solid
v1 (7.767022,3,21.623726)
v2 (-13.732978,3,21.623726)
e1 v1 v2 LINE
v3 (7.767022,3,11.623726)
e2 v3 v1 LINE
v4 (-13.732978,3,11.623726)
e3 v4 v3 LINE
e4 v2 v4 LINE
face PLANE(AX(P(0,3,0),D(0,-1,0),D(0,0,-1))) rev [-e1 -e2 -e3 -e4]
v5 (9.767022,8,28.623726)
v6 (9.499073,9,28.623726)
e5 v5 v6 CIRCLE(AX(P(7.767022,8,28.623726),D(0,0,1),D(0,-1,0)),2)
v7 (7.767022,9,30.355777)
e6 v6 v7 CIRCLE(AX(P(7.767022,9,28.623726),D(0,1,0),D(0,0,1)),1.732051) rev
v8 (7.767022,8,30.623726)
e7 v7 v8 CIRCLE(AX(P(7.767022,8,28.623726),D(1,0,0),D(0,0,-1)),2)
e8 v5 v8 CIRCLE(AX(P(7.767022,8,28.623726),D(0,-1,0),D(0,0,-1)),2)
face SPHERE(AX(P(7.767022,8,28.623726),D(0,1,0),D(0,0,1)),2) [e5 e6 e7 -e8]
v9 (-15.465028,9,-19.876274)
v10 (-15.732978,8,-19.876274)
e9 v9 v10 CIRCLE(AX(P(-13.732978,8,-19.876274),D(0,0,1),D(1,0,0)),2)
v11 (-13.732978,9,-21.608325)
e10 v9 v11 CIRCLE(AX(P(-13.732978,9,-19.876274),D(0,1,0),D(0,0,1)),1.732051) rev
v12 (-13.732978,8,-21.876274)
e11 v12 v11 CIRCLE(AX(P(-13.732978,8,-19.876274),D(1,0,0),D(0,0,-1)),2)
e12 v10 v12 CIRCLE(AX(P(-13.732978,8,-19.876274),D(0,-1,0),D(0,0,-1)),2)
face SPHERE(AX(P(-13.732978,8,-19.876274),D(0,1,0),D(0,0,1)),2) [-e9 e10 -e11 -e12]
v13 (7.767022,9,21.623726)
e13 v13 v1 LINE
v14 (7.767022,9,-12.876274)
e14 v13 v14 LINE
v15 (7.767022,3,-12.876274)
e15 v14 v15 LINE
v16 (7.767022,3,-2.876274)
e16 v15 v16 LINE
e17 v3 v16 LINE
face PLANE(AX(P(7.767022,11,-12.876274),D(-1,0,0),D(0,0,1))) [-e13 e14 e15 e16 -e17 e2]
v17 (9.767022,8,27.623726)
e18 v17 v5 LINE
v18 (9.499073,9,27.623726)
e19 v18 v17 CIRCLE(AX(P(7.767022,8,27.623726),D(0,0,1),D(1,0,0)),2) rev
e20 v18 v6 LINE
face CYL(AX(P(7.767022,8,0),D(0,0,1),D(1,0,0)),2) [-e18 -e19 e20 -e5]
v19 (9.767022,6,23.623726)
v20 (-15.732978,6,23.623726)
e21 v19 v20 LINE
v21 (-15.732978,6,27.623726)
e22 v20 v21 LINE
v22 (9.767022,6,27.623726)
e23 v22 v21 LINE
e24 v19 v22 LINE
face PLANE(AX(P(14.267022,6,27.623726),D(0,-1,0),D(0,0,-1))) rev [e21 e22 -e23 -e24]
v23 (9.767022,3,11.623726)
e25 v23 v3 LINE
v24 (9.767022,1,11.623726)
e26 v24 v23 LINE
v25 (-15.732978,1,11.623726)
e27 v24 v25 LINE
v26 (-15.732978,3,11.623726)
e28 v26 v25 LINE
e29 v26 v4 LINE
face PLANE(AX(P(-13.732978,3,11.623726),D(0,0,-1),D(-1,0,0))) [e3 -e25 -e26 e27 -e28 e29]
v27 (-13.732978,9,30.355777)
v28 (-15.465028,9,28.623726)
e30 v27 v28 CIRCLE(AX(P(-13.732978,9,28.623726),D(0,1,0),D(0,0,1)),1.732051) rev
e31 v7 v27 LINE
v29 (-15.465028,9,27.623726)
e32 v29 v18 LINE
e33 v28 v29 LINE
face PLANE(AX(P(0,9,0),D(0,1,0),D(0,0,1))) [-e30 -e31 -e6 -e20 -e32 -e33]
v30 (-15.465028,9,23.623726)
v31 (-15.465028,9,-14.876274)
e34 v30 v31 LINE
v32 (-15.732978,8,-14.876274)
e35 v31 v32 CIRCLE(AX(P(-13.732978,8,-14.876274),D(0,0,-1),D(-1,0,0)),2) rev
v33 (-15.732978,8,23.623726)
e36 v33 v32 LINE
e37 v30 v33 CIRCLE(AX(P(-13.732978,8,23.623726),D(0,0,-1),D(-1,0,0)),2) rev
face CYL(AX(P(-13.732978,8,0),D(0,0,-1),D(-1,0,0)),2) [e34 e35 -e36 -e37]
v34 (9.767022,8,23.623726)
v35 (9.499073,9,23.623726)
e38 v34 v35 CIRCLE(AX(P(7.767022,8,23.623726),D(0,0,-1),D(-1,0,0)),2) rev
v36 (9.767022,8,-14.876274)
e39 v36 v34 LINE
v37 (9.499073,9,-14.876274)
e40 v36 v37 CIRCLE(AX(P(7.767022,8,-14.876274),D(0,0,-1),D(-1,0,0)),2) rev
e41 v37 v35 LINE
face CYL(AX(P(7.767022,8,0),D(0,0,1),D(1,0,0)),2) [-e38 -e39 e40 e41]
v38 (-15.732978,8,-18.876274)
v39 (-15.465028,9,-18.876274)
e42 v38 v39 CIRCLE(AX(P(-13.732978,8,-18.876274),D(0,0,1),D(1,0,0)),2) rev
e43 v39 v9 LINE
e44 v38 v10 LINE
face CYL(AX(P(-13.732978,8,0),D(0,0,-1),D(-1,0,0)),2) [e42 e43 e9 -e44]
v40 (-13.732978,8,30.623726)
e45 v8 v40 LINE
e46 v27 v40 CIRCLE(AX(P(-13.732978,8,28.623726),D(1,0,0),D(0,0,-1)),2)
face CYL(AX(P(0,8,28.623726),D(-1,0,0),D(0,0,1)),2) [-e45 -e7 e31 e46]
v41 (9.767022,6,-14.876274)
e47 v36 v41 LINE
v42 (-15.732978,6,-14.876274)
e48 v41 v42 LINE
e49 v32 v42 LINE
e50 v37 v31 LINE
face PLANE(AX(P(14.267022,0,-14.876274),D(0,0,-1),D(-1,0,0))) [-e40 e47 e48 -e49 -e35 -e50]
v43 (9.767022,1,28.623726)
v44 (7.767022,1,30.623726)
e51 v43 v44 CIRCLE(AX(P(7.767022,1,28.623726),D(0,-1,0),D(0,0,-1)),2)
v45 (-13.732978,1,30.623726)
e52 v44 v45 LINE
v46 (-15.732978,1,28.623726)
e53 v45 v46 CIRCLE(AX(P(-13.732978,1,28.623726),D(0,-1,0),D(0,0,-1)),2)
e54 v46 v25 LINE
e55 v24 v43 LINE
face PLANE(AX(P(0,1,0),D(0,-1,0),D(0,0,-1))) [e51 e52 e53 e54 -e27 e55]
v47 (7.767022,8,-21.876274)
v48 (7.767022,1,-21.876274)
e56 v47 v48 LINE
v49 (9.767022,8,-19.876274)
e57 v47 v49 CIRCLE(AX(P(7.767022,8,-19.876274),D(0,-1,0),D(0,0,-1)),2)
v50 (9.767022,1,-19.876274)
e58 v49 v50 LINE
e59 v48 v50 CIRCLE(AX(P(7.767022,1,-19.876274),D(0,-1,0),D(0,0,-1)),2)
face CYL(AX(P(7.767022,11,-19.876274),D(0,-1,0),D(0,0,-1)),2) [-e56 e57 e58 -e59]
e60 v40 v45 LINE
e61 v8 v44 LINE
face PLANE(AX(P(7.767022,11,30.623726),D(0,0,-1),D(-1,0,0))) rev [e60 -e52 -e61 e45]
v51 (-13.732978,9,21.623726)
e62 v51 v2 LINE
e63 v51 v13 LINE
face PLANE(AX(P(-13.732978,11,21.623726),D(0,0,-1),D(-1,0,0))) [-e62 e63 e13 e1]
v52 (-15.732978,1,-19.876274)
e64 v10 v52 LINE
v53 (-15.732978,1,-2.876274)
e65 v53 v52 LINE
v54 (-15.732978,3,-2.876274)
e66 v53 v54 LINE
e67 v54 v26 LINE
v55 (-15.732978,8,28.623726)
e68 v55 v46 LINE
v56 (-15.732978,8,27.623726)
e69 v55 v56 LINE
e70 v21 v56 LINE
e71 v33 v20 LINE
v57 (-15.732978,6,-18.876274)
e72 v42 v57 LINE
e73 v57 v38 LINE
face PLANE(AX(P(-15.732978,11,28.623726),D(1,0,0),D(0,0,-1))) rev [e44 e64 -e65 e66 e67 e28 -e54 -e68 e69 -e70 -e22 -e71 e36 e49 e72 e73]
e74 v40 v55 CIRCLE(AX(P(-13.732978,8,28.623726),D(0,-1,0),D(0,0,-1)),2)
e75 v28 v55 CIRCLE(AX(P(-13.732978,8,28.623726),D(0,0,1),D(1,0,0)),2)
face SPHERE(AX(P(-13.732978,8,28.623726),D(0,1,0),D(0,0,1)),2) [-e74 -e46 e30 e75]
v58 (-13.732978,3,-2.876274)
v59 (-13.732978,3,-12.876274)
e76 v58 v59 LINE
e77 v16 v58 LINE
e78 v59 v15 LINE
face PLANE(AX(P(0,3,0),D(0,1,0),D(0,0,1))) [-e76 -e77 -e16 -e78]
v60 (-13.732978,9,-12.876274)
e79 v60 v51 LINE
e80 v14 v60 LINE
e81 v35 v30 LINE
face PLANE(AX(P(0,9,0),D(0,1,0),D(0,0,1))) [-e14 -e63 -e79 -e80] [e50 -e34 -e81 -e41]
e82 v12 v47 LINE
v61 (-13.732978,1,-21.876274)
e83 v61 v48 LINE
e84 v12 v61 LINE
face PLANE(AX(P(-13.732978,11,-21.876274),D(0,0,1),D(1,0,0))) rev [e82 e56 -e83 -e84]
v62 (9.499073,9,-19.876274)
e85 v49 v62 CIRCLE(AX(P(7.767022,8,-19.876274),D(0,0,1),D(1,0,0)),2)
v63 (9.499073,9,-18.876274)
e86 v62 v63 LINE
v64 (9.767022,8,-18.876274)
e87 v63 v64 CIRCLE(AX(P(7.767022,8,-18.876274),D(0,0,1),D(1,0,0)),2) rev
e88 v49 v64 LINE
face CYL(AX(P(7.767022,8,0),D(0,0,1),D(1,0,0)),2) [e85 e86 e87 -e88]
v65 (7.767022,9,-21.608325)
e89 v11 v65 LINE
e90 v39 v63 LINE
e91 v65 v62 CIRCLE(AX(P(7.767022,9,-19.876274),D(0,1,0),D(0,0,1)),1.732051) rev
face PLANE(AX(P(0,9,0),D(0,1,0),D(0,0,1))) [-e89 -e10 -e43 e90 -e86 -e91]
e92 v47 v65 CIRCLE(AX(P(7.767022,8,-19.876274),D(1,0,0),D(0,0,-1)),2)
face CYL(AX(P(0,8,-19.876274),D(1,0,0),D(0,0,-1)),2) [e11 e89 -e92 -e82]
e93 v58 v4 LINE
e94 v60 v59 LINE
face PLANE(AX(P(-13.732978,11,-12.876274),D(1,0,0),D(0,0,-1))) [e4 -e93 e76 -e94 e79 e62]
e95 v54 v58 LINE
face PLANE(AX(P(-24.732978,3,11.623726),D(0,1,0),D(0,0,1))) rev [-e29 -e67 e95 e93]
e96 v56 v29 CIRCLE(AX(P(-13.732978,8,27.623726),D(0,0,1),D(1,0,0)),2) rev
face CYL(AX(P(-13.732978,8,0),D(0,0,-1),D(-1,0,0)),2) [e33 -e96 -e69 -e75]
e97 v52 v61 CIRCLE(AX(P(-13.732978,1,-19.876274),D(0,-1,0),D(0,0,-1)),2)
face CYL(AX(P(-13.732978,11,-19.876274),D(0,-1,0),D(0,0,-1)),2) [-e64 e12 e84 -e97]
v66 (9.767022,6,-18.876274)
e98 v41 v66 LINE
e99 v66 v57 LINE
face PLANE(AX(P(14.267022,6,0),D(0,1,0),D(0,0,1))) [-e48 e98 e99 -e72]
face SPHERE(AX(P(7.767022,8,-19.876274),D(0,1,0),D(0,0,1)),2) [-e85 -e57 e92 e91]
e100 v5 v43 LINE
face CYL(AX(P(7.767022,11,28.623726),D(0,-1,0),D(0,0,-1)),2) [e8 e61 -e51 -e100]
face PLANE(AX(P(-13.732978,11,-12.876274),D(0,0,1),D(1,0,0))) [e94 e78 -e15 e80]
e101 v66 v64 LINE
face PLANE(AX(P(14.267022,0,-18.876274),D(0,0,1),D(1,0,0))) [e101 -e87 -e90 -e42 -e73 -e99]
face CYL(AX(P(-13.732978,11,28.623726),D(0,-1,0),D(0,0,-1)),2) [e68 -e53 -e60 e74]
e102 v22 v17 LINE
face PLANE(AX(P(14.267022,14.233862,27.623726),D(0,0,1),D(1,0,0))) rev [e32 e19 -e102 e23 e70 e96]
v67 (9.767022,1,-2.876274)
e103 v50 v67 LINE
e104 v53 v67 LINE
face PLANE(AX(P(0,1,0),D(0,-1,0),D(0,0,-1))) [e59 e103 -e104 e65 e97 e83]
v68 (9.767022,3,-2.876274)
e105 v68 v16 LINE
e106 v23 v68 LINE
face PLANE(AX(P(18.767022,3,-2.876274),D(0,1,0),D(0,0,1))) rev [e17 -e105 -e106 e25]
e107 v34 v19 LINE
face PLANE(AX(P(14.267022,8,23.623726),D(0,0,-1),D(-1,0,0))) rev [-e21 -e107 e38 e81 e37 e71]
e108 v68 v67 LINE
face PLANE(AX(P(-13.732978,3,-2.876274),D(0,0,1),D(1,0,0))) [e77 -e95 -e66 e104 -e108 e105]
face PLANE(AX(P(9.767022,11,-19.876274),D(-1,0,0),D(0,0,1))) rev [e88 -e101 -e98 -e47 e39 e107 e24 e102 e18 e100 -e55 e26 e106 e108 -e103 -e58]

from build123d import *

# Parameters (mm, degrees)
SKETCH_1_W          = 21.5
SKETCH_1_H          = 34.5
EXTRUDE_2_DEPTH     = 11
FILLET_1_R          = 2
SKETCH_2_W          = 39.173485157
SKETCH_2_H          = 57.857292793
CUT_EXTRUDE_1_DEPTH = 1
SKETCH_3_W          = 21.5
SKETCH_3_H          = 10
EXTRUDE_3_DEPTH     = 3
SKETCH_4_W          = 36.577122412
SKETCH_4_H          = 60.487116615
CUT_EXTRUDE_2_DEPTH = 1
SKETCH_5_W          = 14.5
SKETCH_5_H          = 3
CUT_EXTRUDE_3_DEPTH = 11
SKETCH_6_W          = 14.5
SKETCH_6_H          = 3
CUT_EXTRUDE_4_DEPTH = 11
SKETCH_7_W          = 57.52189795
SKETCH_7_H          = 59.987072635
CUT_EXTRUDE_5_DEPTH = 1
SKETCH_8_W          = 21.5
SKETCH_8_H          = 34.5
EXTRUDE_4_DEPTH     = 1
FILLET_2_R          = 2
SKETCH_9_W          = 42.225742073
SKETCH_9_H          = 59.055369136
CUT_EXTRUDE_6_DEPTH = 1
SKETCH_10_W         = 4
SKETCH_10_H         = 2
SKETCH_10_H_2       = 3.79495429
CUT_EXTRUDE_8_DEPTH = 30
CUT_EXTRUDE_9_DEPTH = 30


with BuildPart() as part:
    # 草图1 → 凸台-拉伸2 (new body)
    with BuildSketch(Plane(origin=(0, 0, 0), x_dir=(1, 0, 0), z_dir=(0, 1, 0))):
        with BuildLine():
            Line((-13.732977682, 21.876274057), (7.767022318, 21.876274057))
            ThreePointArc((7.767022318, 21.876274057), (9.18123588, 21.290487619), (9.767022318, 19.876274057))
            Line((9.767022318, 19.876274057), (9.767022318, -28.623725943))
            ThreePointArc((9.767022318, -28.623725943), (9.18123588, -30.037939506), (7.767022318, -30.623725943))
            Line((7.767022318, -30.623725943), (-13.732977682, -30.623725943))
            ThreePointArc((-13.732977682, -30.623725943), (-15.147191244, -30.037939506), (-15.732977682, -28.623725943))
            Line((-15.732977682, -28.623725943), (-15.732977682, 19.876274057))
            ThreePointArc((-15.732977682, 19.876274057), (-15.147191244, 21.290487619), (-13.732977682, 21.876274057))
        make_face()
        with Locations((-2.982977682, -4.373725943)):
            Rectangle(SKETCH_1_W, SKETCH_1_H, mode=Mode.SUBTRACT)
    extrude(amount=EXTRUDE_2_DEPTH)

    # 圆角1
    fillet_1_edges = [part.edges().sort_by_distance(p)[0] for p in [
        (-15.147191244, 11, -21.290487619),
        (-15.732977682, 11, 4.373725943),
        (-15.147191244, 11, 30.037939506),
        (-2.982977682, 11, 30.623725943),
        (9.18123588, 11, 30.037939506),
        (9.767022318, 11, 4.373725943),
        (9.18123588, 11, -21.290487619),
        (-2.982977682, 11, -21.876274057),
    ]]
    fillet(fillet_1_edges, radius=FILLET_1_R - 0.0001)  # a hair under: the kernel refuses the full size

    # 草图2 → 切除-拉伸1 (cut)
    with BuildSketch(Plane(origin=(0, 11, 0), x_dir=(1, 0, 0), z_dir=(0, 1, 0))):
        with Locations((-2.456788303, -4.185742432)):
            Rectangle(SKETCH_2_W, SKETCH_2_H)
    extrude(amount=-CUT_EXTRUDE_1_DEPTH, mode=Mode.SUBTRACT)

    # 草图3 → 凸台-拉伸3 (add)
    with BuildSketch(Plane(origin=(0, 0, 0), x_dir=(-1, 0, 0), z_dir=(0, -1, 0))):
        with Locations((2.982977682, -16.623725943)):
            Rectangle(SKETCH_3_W, SKETCH_3_H)
        with Locations((2.982977682, 7.876274057)):
            Rectangle(SKETCH_3_W, SKETCH_3_H)
    extrude(amount=-EXTRUDE_3_DEPTH)

    # 草图4 → 切除-拉伸2 (cut)
    with BuildSketch(Plane(origin=(0, 10, 0), x_dir=(1, 0, 0), z_dir=(0, 1, 0))):
        with Locations((-2.114714468, -5.96144712)):
            Rectangle(SKETCH_4_W, SKETCH_4_H)
    extrude(amount=-CUT_EXTRUDE_2_DEPTH, mode=Mode.SUBTRACT)

    # 草图5 → 切除-拉伸3 (cut)
    with BuildSketch(Plane(origin=(-13.732977682, 0, 0), x_dir=(0, 0, -1), z_dir=(1, 0, 0))):
        with Locations((-4.373725943, 1.5)):
            Rectangle(SKETCH_5_W, SKETCH_5_H)
    extrude(amount=-CUT_EXTRUDE_3_DEPTH, mode=Mode.SUBTRACT)

    # 草图6 → 切除-拉伸4 (cut)
    with BuildSketch(Plane.ZY.offset(-7.767022318)):
        with Locations((4.373725943, 1.5)):
            Rectangle(SKETCH_6_W, SKETCH_6_H)
    extrude(amount=-CUT_EXTRUDE_4_DEPTH, mode=Mode.SUBTRACT)

    # 草图7 → 切除-拉伸5 (cut)
    with BuildSketch(Plane(origin=(0, 0, 0), x_dir=(-1, 0, 0), z_dir=(0, -1, 0))):
        with Locations((4.496549364, -6.319684839)):
            Rectangle(SKETCH_7_W, SKETCH_7_H)
    extrude(amount=-CUT_EXTRUDE_5_DEPTH, mode=Mode.SUBTRACT)

    # 草图8 → 凸台-拉伸4 (add)
    with BuildSketch(Plane(origin=(0, 9, 0), x_dir=(1, 0, 0), z_dir=(0, 1, 0))):
        with BuildLine():
            Line((9.767022318, -28.623725943), (9.767022318, 19.876274057))
            ThreePointArc((9.767022318, 19.876274057), (9.18123588, 21.290487619), (7.767022318, 21.876274057))
            Line((7.767022318, 21.876274057), (-13.732977682, 21.876274057))
            ThreePointArc((-13.732977682, 21.876274057), (-15.147191244, 21.290487619), (-15.732977682, 19.876274057))
            Line((-15.732977682, 19.876274057), (-15.732977682, -28.623725943))
            ThreePointArc((-15.732977682, -28.623725943), (-15.147191244, -30.037939506), (-13.732977682, -30.623725943))
            Line((-13.732977682, -30.623725943), (7.767022318, -30.623725943))
            ThreePointArc((7.767022318, -30.623725943), (9.18123588, -30.037939506), (9.767022318, -28.623725943))
        make_face()
        with Locations((-2.982977682, -4.373725943)):
            Rectangle(SKETCH_8_W, SKETCH_8_H, mode=Mode.SUBTRACT)
    extrude(amount=EXTRUDE_4_DEPTH)

    # 圆角2
    fillet_2_edges = [part.edges().sort_by_distance(p)[0] for p in [
        (9.767022318, 10, 4.373725943),
        (9.18123588, 10, -21.290487619),
        (-2.982977682, 10, -21.876274057),
        (-15.147191244, 10, -21.290487619),
        (-15.732977682, 10, 4.373725943),
        (-15.147191244, 10, 30.037939506),
        (-2.982977682, 10, 30.623725943),
        (9.18123588, 10, 30.037939506),
    ]]
    fillet(fillet_2_edges, radius=FILLET_2_R - 0.0001)  # a hair under: the kernel refuses the full size

    # 草图9 → 切除-拉伸6 (cut)
    with BuildSketch(Plane(origin=(0, 10, 0), x_dir=(1, 0, 0), z_dir=(0, 1, 0))):
        with Locations((1.20063142, -3.725323224)):
            Rectangle(SKETCH_9_W, SKETCH_9_H)
    extrude(amount=-CUT_EXTRUDE_6_DEPTH, mode=Mode.SUBTRACT)

    # 草图10 → 切除-拉伸8 (cut)
    with BuildSketch(Plane.ZY.offset(15.732977682)):
        with Locations((-16.876274057, 7)):
            Rectangle(SKETCH_10_W, SKETCH_10_H)
        with Locations((-16.876274057, 9.897477145)):
            Rectangle(SKETCH_10_W, SKETCH_10_H_2)
    extrude(amount=-CUT_EXTRUDE_8_DEPTH, mode=Mode.SUBTRACT)

    # 草图11 → 切除-拉伸9 (cut)
    with BuildSketch(Plane.ZY.offset(15.732977682)):
        Polygon((23.623725943, 8), (23.623725943, 14.233861669), (27.623725943, 14.233861669), (27.623725943, 8), (27.623725943, 6), (23.623725943, 6), align=None)
    extrude(amount=-CUT_EXTRUDE_9_DEPTH, mode=Mode.SUBTRACT)


solid = part.part
